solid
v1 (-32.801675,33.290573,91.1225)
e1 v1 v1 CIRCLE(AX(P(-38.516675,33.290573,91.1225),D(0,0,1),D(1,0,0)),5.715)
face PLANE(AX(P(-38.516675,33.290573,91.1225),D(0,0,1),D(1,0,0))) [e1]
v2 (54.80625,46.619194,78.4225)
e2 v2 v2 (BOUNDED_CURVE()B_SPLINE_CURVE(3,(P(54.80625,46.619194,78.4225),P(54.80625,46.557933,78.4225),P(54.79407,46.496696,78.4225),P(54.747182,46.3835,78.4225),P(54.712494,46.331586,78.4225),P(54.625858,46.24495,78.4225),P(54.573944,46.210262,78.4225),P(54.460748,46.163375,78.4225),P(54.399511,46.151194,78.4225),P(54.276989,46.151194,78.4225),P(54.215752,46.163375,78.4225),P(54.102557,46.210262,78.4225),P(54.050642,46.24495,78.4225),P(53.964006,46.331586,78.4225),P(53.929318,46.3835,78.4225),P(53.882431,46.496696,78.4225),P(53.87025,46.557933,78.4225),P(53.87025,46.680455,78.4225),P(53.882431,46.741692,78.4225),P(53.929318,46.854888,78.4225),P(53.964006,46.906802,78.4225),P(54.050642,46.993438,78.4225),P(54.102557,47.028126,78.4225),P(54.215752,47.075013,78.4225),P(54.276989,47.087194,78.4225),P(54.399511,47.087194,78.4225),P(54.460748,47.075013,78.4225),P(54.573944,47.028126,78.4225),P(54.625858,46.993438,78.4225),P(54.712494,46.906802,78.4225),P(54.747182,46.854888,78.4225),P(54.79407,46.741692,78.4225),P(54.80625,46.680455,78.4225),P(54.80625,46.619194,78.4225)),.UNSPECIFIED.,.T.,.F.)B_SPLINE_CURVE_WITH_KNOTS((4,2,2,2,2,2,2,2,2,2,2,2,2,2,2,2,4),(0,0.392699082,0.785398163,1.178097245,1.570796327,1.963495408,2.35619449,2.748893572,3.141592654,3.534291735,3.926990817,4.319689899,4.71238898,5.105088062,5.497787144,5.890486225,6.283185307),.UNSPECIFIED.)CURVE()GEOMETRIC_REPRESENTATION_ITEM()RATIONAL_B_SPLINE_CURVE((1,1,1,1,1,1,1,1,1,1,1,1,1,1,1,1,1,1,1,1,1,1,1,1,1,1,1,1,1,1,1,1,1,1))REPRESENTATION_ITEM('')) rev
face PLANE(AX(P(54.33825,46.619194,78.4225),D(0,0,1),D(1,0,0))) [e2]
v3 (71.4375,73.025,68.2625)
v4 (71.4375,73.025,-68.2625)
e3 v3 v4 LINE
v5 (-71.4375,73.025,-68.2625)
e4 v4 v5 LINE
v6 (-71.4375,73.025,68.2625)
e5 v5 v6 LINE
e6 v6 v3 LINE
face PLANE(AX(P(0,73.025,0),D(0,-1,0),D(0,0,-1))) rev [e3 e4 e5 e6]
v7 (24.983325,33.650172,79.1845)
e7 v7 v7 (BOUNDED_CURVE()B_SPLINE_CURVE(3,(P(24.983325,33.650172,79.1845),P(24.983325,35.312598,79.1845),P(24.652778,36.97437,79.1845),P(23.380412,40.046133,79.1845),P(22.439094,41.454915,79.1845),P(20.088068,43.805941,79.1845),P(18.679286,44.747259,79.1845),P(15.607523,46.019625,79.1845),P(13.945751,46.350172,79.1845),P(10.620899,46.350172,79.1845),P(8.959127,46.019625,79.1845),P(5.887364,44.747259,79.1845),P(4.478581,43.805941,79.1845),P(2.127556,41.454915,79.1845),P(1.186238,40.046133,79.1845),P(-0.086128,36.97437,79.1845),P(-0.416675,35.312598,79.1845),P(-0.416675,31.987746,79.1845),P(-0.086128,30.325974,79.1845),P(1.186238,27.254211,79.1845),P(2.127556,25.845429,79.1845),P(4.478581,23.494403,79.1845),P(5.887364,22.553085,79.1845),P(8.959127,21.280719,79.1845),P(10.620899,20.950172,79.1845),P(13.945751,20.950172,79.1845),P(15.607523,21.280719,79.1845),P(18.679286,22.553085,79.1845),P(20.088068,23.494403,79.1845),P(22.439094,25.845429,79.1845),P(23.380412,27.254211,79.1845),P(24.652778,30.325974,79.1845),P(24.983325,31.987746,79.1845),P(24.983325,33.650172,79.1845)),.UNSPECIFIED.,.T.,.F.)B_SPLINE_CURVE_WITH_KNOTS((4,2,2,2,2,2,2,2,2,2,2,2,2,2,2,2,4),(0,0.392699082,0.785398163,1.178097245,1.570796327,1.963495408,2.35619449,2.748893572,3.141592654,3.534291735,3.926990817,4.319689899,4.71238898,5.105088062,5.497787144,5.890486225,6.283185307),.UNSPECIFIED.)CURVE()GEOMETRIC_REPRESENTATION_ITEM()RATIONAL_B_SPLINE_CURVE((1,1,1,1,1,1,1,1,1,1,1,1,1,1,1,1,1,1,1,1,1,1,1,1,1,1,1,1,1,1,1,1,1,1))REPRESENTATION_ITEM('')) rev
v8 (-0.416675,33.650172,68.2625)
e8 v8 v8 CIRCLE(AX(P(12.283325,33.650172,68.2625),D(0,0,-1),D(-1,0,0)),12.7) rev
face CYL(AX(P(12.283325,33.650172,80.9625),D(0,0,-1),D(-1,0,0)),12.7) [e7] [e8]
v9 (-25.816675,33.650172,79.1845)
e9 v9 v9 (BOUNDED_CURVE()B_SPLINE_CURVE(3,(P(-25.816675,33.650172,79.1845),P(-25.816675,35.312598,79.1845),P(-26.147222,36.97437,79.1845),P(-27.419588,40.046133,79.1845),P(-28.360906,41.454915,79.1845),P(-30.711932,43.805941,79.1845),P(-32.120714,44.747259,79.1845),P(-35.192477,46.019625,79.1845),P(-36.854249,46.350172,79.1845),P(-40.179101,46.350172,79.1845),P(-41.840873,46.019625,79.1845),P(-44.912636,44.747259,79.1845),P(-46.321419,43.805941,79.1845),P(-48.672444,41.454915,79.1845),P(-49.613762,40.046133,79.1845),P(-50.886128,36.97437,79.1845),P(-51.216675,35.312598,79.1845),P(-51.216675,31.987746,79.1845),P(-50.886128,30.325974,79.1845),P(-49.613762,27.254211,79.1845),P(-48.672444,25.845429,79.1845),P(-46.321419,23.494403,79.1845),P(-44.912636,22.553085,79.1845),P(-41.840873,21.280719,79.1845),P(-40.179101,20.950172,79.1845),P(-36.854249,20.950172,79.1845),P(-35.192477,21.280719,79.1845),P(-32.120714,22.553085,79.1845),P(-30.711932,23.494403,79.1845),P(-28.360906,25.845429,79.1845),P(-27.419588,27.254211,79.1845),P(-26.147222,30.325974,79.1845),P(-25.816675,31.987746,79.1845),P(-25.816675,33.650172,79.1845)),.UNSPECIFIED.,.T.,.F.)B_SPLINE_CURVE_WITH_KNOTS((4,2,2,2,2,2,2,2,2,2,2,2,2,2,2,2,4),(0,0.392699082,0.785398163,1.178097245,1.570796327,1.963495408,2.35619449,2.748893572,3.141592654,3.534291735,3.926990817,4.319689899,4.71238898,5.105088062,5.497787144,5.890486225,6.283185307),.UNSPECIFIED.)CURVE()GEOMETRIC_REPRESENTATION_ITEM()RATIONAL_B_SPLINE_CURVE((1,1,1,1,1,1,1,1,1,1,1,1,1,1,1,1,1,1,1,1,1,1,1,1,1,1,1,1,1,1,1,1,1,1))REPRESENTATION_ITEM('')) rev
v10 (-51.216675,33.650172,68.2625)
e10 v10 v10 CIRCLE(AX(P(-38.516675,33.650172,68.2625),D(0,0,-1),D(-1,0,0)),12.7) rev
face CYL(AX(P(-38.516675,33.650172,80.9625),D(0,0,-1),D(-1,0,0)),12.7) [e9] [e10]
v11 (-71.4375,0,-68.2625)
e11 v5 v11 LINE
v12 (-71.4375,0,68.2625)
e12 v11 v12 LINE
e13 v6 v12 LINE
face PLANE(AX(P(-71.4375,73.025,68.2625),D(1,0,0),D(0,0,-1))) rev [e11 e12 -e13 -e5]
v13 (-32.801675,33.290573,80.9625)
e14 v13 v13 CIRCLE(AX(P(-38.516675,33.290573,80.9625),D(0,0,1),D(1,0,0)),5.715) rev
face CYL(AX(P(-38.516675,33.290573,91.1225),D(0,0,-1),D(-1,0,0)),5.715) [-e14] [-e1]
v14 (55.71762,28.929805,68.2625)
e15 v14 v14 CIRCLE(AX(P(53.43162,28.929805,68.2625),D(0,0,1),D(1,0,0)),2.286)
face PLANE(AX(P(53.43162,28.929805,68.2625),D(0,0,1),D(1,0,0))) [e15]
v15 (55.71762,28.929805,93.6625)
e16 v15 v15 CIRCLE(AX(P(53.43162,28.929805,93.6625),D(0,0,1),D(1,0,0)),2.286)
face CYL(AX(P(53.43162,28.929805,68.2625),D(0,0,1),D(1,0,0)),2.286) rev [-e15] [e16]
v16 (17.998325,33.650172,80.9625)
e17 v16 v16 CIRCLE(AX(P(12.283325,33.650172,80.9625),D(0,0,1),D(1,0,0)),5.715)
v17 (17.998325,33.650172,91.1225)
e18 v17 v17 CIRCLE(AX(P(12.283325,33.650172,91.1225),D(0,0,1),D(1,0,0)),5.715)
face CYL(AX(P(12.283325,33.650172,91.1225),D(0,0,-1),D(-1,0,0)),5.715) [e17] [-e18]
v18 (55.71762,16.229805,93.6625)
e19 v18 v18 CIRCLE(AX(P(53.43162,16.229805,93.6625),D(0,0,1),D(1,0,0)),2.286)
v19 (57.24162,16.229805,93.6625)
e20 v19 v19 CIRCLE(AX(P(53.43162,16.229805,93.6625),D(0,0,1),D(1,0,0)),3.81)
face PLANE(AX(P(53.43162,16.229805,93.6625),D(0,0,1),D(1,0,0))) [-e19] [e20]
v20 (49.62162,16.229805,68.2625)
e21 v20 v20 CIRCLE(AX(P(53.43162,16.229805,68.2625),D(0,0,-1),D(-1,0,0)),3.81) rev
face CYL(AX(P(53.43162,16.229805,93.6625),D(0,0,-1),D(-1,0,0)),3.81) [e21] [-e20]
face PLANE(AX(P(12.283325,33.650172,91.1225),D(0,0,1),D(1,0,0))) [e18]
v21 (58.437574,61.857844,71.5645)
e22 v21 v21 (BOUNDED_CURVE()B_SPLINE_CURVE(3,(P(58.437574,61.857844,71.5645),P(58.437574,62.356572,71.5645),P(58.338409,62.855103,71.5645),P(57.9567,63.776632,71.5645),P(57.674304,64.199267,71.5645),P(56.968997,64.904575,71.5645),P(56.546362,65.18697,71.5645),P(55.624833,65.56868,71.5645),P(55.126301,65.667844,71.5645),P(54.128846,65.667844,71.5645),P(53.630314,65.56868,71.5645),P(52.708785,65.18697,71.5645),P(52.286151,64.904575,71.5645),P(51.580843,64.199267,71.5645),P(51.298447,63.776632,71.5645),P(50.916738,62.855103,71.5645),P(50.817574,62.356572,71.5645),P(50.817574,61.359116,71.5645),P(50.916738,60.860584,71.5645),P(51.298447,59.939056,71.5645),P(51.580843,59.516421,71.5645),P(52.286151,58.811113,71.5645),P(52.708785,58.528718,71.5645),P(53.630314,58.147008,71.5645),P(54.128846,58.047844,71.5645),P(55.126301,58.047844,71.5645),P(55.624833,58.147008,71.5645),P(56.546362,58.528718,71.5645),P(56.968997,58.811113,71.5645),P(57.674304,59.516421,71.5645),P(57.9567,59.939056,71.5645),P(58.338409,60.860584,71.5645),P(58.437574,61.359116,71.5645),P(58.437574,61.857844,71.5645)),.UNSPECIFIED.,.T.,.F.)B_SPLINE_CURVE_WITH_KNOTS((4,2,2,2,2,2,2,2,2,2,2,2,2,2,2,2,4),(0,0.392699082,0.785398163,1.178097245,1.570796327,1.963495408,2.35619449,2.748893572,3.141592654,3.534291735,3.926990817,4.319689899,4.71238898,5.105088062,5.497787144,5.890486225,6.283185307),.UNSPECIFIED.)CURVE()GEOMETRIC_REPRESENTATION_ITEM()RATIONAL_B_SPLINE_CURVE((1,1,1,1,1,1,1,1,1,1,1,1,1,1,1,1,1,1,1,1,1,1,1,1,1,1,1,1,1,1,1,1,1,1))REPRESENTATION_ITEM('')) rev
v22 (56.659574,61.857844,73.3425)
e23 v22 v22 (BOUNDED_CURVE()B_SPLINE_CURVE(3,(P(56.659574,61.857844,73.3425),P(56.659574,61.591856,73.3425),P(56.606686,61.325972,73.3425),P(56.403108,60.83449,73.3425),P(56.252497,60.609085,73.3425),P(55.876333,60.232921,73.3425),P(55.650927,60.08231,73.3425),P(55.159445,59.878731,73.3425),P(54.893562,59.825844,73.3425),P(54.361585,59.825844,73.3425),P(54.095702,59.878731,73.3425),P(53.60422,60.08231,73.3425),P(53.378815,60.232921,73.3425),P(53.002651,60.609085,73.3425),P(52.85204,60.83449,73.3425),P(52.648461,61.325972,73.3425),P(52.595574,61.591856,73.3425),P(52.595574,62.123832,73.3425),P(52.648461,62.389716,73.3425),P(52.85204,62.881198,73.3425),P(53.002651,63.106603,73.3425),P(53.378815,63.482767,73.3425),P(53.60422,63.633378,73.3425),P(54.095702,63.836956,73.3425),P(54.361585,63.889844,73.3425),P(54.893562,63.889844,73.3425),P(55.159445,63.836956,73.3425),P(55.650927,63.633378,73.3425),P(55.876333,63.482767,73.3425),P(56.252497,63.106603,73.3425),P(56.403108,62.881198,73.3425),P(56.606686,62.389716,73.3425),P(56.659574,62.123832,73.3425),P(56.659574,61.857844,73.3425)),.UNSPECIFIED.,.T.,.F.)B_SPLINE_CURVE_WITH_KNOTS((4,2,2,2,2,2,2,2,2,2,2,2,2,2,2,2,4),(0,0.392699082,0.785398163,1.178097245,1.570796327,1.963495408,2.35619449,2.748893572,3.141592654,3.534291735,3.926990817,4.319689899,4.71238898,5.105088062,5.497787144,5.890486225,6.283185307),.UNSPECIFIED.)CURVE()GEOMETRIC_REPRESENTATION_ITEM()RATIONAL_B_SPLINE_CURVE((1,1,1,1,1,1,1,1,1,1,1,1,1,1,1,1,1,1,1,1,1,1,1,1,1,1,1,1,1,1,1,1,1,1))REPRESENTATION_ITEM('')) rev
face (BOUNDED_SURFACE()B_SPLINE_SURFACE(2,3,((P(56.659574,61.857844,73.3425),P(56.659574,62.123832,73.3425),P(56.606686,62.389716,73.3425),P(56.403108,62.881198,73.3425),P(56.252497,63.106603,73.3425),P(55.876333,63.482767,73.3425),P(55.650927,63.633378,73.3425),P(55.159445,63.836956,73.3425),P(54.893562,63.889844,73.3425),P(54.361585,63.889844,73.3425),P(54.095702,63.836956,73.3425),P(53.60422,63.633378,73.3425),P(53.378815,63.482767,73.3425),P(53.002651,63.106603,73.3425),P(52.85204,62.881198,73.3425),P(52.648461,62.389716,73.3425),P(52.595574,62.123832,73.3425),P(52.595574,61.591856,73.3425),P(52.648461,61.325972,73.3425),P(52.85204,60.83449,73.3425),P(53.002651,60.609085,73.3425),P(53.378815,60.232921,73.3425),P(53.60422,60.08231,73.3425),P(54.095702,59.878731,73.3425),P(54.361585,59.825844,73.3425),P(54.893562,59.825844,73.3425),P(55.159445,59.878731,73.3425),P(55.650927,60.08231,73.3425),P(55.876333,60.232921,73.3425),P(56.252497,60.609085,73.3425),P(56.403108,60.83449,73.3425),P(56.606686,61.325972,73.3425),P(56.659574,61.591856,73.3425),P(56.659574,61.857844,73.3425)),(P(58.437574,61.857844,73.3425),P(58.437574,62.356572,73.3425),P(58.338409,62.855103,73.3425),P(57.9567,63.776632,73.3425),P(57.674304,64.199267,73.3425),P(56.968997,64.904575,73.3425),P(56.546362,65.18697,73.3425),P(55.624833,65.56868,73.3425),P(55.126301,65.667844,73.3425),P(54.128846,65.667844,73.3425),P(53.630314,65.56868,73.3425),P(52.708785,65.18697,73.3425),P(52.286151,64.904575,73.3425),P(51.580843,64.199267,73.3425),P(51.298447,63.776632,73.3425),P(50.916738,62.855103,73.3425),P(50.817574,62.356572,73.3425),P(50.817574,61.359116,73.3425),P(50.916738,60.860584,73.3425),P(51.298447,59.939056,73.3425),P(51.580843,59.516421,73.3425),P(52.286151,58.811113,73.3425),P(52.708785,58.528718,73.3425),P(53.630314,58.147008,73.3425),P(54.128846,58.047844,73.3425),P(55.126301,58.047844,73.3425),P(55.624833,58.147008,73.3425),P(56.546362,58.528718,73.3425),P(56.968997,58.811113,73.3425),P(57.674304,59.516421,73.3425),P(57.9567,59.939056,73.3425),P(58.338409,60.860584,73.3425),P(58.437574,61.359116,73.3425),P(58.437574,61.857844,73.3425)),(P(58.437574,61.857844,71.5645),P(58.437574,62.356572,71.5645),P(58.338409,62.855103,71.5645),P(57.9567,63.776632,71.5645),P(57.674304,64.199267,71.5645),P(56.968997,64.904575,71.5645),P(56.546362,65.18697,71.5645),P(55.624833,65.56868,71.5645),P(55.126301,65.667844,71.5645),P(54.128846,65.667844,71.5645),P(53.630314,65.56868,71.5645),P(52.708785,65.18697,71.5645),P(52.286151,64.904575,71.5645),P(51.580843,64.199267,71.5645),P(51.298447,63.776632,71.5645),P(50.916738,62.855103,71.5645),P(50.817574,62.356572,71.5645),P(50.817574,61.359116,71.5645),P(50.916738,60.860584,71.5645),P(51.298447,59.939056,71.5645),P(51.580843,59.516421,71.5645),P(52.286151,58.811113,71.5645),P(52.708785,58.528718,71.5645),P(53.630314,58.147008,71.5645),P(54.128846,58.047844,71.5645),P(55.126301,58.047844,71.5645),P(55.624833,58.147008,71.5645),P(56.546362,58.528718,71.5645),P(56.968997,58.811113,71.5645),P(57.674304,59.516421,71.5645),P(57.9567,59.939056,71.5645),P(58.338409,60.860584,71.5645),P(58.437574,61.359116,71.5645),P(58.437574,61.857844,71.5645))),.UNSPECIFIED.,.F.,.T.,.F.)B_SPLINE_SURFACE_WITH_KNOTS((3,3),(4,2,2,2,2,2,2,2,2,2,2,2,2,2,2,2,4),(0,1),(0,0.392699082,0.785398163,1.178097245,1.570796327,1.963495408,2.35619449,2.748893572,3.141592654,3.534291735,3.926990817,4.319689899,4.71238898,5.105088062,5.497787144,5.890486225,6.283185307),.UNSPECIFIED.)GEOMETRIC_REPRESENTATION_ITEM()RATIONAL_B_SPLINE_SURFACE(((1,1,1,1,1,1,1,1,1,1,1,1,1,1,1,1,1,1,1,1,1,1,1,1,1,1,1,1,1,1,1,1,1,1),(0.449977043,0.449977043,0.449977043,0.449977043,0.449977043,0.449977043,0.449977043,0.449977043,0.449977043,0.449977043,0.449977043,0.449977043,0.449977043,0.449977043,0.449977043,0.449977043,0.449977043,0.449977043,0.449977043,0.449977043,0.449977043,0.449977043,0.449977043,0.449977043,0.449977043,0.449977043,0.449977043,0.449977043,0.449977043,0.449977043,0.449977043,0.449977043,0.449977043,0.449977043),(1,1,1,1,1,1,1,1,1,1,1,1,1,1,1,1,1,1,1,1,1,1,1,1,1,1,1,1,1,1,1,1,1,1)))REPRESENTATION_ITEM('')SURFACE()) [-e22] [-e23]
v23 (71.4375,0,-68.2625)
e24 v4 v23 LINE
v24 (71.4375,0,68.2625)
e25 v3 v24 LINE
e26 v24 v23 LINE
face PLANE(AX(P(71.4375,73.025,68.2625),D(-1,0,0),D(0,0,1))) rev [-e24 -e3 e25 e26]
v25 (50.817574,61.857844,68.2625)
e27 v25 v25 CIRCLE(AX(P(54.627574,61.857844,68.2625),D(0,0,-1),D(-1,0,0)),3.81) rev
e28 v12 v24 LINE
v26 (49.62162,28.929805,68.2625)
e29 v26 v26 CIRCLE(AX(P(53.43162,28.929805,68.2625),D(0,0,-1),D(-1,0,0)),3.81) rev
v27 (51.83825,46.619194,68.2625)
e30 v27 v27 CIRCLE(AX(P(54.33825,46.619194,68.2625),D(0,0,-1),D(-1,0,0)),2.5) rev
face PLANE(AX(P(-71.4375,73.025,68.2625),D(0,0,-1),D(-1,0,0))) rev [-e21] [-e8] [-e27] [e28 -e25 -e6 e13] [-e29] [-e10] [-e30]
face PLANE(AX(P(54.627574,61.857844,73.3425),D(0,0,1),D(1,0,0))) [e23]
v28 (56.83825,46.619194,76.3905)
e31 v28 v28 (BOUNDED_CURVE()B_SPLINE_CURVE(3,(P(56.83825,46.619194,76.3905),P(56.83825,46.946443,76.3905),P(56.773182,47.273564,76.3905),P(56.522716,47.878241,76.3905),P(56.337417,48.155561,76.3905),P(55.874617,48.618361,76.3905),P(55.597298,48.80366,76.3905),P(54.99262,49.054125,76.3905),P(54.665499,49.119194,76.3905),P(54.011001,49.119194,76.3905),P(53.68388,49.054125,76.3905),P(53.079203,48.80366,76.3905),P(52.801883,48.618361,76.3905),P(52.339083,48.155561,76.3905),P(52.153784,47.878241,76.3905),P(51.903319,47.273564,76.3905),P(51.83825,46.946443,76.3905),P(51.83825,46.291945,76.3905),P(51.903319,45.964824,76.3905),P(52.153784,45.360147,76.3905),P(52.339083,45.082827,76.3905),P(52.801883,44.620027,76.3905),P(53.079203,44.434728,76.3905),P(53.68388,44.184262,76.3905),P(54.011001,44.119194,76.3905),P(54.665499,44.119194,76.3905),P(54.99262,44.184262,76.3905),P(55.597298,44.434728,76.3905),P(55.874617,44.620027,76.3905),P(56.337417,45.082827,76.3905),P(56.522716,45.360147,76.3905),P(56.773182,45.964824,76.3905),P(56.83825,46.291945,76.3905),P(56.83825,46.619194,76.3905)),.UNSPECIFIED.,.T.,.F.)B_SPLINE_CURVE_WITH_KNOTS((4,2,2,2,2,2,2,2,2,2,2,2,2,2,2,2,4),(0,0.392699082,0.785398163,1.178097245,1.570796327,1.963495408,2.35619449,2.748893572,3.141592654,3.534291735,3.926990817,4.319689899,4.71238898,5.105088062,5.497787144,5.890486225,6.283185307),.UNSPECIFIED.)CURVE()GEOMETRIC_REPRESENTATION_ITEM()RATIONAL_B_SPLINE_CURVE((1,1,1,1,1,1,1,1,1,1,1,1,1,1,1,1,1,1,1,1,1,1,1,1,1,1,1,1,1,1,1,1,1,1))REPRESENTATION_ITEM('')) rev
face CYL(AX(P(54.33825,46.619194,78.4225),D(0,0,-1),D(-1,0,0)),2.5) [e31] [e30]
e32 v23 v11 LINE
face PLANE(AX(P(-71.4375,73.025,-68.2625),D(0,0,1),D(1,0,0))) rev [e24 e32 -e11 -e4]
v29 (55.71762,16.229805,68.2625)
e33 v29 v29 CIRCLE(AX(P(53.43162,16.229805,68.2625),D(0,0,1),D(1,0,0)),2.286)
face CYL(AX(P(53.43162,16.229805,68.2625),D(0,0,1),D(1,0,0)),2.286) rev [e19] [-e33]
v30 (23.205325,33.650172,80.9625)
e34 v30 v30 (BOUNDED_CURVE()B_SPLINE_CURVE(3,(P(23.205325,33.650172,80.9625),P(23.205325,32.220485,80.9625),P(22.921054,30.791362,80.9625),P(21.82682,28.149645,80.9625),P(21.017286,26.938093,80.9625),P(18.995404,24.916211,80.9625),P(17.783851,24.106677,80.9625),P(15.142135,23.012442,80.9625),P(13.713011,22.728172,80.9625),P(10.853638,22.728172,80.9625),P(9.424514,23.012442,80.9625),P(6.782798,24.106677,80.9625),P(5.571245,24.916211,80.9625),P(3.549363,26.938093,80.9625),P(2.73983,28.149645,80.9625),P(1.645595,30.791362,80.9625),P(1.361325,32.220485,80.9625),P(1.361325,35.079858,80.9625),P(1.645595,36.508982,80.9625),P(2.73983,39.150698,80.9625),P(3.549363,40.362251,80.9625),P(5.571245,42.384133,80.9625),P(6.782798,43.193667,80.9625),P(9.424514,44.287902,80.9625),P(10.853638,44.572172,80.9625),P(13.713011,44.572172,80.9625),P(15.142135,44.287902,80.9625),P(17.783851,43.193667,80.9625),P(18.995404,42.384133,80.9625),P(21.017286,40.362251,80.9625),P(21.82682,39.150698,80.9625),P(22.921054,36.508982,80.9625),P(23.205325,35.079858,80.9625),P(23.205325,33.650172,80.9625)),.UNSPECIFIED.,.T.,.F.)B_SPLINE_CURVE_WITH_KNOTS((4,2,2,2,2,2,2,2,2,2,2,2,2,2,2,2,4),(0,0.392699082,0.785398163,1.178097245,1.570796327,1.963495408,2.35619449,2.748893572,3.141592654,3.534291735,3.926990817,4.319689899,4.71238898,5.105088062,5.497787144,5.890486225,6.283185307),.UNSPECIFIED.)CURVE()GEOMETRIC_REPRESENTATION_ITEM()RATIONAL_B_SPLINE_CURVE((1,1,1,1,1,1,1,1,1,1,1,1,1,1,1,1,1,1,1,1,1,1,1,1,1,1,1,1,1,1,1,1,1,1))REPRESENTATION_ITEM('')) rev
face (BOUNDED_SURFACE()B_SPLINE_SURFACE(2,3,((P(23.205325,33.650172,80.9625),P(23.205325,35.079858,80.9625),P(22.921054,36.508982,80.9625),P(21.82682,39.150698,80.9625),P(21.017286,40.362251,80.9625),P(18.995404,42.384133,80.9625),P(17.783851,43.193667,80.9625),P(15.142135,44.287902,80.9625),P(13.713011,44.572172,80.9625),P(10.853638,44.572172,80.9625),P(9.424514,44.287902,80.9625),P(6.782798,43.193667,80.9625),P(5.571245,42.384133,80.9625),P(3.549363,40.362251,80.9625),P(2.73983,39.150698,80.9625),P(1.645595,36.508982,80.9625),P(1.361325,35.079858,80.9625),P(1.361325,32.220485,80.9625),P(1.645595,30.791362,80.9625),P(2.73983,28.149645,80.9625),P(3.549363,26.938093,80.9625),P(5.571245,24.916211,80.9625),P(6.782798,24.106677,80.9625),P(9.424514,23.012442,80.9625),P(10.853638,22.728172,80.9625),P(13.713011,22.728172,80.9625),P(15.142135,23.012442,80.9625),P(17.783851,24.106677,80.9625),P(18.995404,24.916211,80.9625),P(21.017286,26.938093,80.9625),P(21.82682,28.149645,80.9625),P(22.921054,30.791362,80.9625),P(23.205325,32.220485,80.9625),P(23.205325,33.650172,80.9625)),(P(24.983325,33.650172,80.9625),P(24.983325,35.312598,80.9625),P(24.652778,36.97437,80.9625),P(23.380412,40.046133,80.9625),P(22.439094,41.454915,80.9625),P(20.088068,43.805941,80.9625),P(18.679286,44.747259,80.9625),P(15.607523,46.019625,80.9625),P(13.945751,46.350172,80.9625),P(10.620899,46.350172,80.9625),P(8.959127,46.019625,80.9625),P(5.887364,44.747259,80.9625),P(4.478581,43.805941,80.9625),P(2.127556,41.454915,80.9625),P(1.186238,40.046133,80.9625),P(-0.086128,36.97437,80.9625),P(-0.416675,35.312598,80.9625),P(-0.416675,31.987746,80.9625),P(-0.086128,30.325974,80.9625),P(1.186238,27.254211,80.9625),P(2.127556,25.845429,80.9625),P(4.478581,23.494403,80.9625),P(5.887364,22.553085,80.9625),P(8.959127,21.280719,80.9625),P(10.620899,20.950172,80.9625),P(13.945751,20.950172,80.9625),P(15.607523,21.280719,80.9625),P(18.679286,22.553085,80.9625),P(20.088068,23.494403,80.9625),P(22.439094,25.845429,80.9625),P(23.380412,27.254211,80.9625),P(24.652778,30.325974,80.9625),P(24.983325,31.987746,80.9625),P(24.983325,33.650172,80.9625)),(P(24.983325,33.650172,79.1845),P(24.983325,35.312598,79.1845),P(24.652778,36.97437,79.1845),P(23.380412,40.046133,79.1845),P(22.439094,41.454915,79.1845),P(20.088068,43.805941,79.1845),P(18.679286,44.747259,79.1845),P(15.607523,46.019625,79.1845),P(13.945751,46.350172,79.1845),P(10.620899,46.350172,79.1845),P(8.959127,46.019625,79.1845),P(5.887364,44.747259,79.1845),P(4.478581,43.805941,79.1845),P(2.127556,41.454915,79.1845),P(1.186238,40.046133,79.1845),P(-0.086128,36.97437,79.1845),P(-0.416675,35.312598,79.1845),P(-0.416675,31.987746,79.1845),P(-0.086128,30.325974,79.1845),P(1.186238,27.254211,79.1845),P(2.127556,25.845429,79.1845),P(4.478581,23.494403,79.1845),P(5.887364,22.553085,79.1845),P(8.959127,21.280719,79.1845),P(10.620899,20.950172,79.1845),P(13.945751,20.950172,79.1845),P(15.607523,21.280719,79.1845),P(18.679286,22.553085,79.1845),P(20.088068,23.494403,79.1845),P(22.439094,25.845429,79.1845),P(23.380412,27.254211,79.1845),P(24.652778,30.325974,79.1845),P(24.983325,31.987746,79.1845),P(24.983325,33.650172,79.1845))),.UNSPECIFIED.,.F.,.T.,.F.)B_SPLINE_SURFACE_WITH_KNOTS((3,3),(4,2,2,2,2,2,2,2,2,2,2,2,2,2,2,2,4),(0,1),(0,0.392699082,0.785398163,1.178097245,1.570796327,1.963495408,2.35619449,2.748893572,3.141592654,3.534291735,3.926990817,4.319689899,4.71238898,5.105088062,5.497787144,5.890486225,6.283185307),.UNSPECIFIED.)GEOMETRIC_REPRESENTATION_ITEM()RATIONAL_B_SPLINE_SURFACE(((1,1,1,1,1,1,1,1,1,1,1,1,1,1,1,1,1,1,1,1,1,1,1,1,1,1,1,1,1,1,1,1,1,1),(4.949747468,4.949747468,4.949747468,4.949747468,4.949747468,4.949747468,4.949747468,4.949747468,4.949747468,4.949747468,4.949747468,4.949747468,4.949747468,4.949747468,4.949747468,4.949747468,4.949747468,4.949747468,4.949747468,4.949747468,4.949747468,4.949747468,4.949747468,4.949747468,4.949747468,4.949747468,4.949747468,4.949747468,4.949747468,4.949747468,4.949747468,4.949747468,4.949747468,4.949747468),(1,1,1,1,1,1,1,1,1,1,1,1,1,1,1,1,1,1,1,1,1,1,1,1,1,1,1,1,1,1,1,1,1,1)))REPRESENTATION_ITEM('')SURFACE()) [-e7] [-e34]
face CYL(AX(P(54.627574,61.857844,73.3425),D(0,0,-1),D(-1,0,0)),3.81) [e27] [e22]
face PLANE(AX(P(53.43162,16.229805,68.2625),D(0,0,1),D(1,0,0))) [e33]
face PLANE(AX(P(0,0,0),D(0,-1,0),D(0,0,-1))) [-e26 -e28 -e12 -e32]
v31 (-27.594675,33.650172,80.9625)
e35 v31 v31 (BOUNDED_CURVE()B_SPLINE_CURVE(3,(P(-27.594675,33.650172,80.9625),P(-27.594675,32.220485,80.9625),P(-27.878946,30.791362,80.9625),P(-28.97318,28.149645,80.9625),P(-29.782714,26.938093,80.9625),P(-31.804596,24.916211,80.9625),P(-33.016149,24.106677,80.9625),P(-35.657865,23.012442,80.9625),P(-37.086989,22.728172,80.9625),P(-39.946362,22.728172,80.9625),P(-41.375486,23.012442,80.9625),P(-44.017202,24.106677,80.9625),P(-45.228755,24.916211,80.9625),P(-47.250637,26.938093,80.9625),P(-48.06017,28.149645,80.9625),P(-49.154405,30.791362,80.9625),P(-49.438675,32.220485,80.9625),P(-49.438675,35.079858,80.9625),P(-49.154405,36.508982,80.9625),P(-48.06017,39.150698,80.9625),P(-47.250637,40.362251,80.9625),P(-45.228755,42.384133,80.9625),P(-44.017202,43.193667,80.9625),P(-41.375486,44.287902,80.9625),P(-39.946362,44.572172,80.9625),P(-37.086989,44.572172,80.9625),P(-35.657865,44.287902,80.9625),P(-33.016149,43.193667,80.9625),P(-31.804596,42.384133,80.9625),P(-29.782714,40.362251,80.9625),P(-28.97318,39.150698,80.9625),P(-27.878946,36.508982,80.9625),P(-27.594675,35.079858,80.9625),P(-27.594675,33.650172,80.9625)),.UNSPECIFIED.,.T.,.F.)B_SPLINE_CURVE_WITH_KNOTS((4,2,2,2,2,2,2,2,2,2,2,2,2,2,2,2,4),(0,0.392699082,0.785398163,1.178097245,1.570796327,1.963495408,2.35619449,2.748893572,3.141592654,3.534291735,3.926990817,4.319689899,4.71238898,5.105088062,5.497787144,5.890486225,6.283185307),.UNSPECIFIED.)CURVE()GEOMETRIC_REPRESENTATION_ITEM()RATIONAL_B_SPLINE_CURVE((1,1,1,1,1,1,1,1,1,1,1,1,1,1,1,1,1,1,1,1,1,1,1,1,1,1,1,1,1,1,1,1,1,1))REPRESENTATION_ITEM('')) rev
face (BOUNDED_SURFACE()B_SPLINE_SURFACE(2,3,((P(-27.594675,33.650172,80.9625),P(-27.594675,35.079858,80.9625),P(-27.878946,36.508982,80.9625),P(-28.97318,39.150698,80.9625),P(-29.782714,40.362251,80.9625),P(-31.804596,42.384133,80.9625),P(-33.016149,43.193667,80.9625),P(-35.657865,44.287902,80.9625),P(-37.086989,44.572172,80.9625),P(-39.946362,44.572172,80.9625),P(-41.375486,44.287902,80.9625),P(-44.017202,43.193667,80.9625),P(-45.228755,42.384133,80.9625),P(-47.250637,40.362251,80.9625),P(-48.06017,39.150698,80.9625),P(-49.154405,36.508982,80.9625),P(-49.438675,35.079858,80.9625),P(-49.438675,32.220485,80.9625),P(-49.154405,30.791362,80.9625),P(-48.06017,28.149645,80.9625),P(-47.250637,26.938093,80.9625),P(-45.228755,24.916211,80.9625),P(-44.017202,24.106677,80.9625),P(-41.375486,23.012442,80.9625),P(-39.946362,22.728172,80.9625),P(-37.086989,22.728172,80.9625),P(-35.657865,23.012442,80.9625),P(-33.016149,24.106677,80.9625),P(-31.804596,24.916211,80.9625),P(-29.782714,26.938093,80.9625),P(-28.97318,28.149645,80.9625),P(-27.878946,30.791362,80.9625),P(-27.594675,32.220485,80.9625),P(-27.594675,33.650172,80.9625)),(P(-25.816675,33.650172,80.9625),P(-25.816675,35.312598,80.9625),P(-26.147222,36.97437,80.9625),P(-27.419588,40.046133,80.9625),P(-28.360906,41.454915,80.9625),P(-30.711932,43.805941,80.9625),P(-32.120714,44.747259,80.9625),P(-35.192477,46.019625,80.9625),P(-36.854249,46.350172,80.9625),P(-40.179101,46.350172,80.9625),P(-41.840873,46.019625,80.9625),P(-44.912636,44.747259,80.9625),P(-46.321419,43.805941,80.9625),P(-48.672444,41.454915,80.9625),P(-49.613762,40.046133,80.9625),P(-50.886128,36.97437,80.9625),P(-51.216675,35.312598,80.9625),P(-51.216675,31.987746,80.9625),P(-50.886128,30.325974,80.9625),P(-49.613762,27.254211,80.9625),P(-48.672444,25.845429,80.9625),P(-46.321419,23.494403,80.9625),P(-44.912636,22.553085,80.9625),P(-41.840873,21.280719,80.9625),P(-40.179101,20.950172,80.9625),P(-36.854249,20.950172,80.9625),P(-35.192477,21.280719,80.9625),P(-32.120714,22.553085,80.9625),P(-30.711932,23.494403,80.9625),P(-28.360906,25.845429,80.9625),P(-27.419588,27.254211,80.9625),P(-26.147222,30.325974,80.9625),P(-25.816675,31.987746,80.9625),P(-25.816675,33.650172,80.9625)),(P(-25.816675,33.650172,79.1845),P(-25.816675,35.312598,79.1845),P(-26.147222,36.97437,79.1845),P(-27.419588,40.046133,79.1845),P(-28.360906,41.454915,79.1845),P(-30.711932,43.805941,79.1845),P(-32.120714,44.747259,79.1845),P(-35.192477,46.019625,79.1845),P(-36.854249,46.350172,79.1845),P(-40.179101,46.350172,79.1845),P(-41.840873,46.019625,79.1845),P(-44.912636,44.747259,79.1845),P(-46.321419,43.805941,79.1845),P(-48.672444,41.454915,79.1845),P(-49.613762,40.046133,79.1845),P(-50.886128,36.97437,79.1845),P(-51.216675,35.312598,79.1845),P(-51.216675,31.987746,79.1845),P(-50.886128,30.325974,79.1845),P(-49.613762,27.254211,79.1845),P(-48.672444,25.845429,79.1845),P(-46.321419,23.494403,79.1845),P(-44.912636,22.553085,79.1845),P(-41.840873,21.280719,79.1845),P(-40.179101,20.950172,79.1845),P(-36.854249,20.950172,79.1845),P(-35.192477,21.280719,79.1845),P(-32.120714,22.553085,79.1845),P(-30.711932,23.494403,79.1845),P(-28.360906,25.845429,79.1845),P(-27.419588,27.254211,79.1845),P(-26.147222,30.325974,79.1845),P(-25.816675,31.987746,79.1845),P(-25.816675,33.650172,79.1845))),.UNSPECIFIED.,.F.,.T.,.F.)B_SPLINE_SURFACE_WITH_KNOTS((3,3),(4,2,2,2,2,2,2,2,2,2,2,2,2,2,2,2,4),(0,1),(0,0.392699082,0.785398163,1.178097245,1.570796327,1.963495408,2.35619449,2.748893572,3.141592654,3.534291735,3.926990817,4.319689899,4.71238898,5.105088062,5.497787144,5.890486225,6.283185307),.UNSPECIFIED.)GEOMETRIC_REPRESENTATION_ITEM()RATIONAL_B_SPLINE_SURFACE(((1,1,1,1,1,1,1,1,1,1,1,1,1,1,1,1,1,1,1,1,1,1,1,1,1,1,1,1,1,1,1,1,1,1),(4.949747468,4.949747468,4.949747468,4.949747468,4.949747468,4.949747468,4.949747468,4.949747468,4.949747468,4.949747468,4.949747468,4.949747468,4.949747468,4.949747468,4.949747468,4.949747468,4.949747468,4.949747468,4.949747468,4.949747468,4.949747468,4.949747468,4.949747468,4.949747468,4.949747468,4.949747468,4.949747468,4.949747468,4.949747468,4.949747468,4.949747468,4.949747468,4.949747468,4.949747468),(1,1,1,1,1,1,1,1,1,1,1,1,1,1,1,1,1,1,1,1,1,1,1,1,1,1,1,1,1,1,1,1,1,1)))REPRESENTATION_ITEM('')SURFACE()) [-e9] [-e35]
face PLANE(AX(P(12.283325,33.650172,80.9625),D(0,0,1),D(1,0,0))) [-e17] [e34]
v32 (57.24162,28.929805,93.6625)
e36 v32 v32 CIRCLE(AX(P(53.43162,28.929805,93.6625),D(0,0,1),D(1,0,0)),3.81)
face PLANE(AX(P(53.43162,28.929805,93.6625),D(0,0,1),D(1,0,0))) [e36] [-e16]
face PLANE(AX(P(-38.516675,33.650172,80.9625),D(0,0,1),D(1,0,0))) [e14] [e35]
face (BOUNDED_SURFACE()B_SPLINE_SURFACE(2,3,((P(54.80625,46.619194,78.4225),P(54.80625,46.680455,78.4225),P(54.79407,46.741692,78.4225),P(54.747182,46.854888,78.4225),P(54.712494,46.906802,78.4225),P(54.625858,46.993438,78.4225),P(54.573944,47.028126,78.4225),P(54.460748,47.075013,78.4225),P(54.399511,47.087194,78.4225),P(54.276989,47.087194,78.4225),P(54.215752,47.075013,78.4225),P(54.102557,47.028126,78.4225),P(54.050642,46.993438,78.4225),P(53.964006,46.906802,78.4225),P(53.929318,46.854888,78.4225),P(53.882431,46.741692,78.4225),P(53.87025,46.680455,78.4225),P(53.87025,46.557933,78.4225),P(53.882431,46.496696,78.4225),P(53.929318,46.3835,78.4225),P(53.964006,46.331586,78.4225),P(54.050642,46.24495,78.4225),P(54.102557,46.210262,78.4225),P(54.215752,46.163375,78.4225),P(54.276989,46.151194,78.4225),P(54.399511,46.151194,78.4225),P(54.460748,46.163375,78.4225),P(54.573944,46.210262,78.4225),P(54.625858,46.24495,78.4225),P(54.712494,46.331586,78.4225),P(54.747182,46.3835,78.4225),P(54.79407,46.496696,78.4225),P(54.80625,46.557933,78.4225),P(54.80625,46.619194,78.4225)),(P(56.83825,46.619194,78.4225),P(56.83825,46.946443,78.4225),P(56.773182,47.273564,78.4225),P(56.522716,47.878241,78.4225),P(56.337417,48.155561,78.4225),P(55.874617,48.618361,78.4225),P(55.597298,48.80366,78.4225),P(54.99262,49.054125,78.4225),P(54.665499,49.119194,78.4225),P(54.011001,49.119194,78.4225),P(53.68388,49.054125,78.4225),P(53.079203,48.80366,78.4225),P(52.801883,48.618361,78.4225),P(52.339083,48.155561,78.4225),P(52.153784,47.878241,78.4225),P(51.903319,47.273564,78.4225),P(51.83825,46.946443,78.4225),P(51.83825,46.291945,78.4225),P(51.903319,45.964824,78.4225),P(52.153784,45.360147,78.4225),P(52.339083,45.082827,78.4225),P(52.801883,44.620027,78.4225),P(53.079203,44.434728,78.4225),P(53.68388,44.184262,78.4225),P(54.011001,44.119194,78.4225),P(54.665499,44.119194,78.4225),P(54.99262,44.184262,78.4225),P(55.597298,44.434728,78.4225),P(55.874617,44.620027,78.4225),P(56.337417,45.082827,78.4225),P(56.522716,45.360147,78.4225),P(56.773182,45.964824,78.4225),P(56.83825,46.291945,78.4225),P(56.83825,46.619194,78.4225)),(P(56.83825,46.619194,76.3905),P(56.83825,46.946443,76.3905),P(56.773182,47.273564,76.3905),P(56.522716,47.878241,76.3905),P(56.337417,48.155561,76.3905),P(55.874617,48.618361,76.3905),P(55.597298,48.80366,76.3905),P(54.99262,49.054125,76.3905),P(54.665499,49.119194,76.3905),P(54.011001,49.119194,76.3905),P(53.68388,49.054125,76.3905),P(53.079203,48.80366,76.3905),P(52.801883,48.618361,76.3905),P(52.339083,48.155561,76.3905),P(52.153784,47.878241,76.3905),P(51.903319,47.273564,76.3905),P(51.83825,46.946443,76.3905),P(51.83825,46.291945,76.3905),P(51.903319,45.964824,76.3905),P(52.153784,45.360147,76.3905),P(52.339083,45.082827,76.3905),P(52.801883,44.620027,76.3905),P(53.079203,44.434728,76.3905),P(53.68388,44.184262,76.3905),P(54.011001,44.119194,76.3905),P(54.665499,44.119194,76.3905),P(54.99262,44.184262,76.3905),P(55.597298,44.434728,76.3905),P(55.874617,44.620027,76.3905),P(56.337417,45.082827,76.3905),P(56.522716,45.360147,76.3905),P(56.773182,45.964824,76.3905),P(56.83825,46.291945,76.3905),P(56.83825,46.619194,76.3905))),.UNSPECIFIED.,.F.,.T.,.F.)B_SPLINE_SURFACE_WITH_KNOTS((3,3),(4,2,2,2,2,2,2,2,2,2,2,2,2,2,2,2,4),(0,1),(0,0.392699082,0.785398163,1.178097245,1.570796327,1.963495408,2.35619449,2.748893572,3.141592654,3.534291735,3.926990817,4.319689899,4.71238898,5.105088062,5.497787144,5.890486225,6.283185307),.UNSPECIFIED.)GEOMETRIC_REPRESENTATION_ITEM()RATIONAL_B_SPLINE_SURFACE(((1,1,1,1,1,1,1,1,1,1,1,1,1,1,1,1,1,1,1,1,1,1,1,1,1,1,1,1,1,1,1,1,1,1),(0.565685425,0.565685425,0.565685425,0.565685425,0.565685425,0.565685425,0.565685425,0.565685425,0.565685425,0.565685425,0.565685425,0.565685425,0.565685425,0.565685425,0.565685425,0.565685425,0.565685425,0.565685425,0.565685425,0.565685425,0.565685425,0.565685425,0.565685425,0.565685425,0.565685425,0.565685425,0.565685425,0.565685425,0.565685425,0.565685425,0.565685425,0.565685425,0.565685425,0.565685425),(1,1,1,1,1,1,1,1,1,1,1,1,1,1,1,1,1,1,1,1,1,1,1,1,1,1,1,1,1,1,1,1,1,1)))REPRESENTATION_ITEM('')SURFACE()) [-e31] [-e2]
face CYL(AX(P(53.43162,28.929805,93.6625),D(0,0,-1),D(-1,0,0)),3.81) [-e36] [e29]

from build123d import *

# Parameters (mm, degrees)
SKETCH1_W           = 142.875
SKETCH1_H           = 136.525
BOSS_EXTRUDE1_DEPTH = 73.025
SKETCH2_R           = 12.7
BOSS_EXTRUDE2_DEPTH = 12.7
FILLET2_SIZE        = 1.778
SKETCH3_R           = 5.715
BOSS_EXTRUDE3_DEPTH = 22.86
LPATTERN1_COUNT     = 2
LPATTERN1_PITCH     = 50.8
FILLET3_SIZE        = 1.778
SKETCH5_R           = 5.715
BOSS_EXTRUDE4_DEPTH = 10.16
SKETCH6_R           = 3.81
BOSS_EXTRUDE5_DEPTH = 5.08
FILLET4_SIZE        = 1.778
SKETCH7_R           = 2.5
BOSS_EXTRUDE6_DEPTH = 10.16
FILLET5_SIZE        = 2.032
SKETCH9_R           = 3.81
BOSS_EXTRUDE7_DEPTH = 25.4
SKETCH10_R          = 2.286
CUT_EXTRUDE1_DEPTH  = 25.4
LPATTERN2_COUNT     = 2
LPATTERN2_PITCH     = 12.7
SKETCH11_R          = 2.286
CUT_EXTRUDE2_DEPTH  = 25.4


with BuildPart() as part:
    # Sketch1 → Boss-Extrude1 (new body)
    with BuildSketch(Plane(origin=(0, 0, 0), x_dir=(1, 0, 0), z_dir=(0, 1, 0))):
        Rectangle(SKETCH1_W, SKETCH1_H)
    extrude(amount=BOSS_EXTRUDE1_DEPTH)

    # Sketch2 → Boss-Extrude2 (add)
    with BuildSketch(Plane.XY.offset(68.2625)):
        with Locations(Location((-38.516675306, 33.650171928, 0), (0, 0, 180))):
            Circle(SKETCH2_R)
    boss_extrude2 = extrude(amount=BOSS_EXTRUDE2_DEPTH)

    # Fillet2
    # a fillet whose section is not a circle: 1.778 mm, written as the material it takes off along each edge
    with BuildSketch(Plane(origin=(-38.516675306, 33.650171928, 80.9625), x_dir=(-1, 0, 0), z_dir=(0, 1, 0))) as fillet2_piece_1:
        with BuildLine():
            Bezier((12.7, -FILLET2_SIZE), (12.7, 0), (12.7 - FILLET2_SIZE, 0), weights=[1, 4.949747468, 1])
            Line((12.7 - FILLET2_SIZE, 0), (12.7, 0))
            Line((12.7, 0), (12.7, -FILLET2_SIZE))
        make_face()
    revolve(axis=Axis((-38.516675306, 33.650171928, 80.9625), (0, 0, 1)), mode=Mode.SUBTRACT)

    # Sketch3 → Boss-Extrude3 (add)
    with BuildSketch(Plane.XY.offset(68.2625)):
        with Locations((-38.516675306, 33.290572788)):
            Circle(SKETCH3_R)
    extrude(amount=BOSS_EXTRUDE3_DEPTH)

    # LPattern1: Boss-Extrude2 ×2
    with Locations(*[(i * LPATTERN1_PITCH, 0, 0) for i in range(1, LPATTERN1_COUNT)]):
        add(boss_extrude2)

    # Fillet3
    # a fillet whose section is not a circle: 1.778 mm, written as the material it takes off along each edge
    with BuildSketch(Plane(origin=(12.283324694, 33.650171928, 80.9625), x_dir=(-1, 0, 0), z_dir=(0, 1, 0))) as fillet3_piece_1:
        with BuildLine():
            Bezier((12.7, -FILLET3_SIZE), (12.7, 0), (12.7 - FILLET3_SIZE, 0), weights=[1, 4.949747468, 1])
            Line((12.7 - FILLET3_SIZE, 0), (12.7, 0))
            Line((12.7, 0), (12.7, -FILLET3_SIZE))
        make_face()
    revolve(axis=Axis((12.283324694, 33.650171928, 80.9625), (0, 0, 1)), mode=Mode.SUBTRACT)

    # Sketch5 → Boss-Extrude4 (add)
    with BuildSketch(Plane.XY.offset(80.9625)):
        with Locations((12.283324694, 33.650171928)):
            Circle(SKETCH5_R)
    extrude(amount=BOSS_EXTRUDE4_DEPTH)

    # Sketch6 → Boss-Extrude5 (add)
    with BuildSketch(Plane.XY.offset(68.2625)):
        with Locations(Location((54.627573576, 61.857843882, 0), (0, 0, 180))):
            Circle(SKETCH6_R)
    extrude(amount=BOSS_EXTRUDE5_DEPTH)

    # Fillet4
    # a fillet whose section is not a circle: 1.778 mm, written as the material it takes off along each edge
    with BuildSketch(Plane(origin=(54.627573576, 61.857843882, 73.3425), x_dir=(-1, 0, 0), z_dir=(0, 1, 0))) as fillet4_piece_1:
        with BuildLine():
            Bezier((3.81, -FILLET4_SIZE), (3.81, 0), (3.81 - FILLET4_SIZE, 0), weights=[1, 0.449977043, 1])
            Line((3.81 - FILLET4_SIZE, 0), (3.81, 0))
            Line((3.81, 0), (3.81, -FILLET4_SIZE))
        make_face()
    revolve(axis=Axis((54.627573576, 61.857843882, 73.3425), (0, 0, 1)), mode=Mode.SUBTRACT)

    # Sketch7 → Boss-Extrude6 (add)
    with BuildSketch(Plane.XY.offset(68.2625)):
        with Locations(Location((54.338250319, 46.619193899, 0), (0, 0, 180))):
            Circle(SKETCH7_R)
    extrude(amount=BOSS_EXTRUDE6_DEPTH)

    # Fillet5
    # a fillet whose section is not a circle: 2.032 mm, written as the material it takes off along each edge
    with BuildSketch(Plane(origin=(54.338250319, 46.619193899, 78.4225), x_dir=(-1, 0, 0), z_dir=(0, 1, 0))) as fillet5_piece_1:
        with BuildLine():
            Bezier((2.5, -FILLET5_SIZE), (2.5, 0), (2.5 - FILLET5_SIZE, 0), weights=[1, 0.565685425, 1])
            Line((2.5 - FILLET5_SIZE, 0), (2.5, 0))
            Line((2.5, 0), (2.5, -FILLET5_SIZE))
        make_face()
    revolve(axis=Axis((54.338250319, 46.619193899, 78.4225), (0, 0, 1)), mode=Mode.SUBTRACT)

    # Sketch9 → Boss-Extrude7 (add)
    with BuildSketch(Plane.XY.offset(68.2625)):
        with Locations(Location((53.431620425, 28.929804746, 0), (0, 0, 180))):
            Circle(SKETCH9_R)
    boss_extrude7 = extrude(amount=BOSS_EXTRUDE7_DEPTH)

    # Sketch10 → Cut-Extrude1 (cut)
    with BuildSketch(Plane.XY.offset(93.6625)):
        with Locations((53.431620425, 28.929804746)):
            Circle(SKETCH10_R)
    extrude(amount=-CUT_EXTRUDE1_DEPTH, mode=Mode.SUBTRACT)

    # LPattern2: Boss-Extrude7 ×2
    with Locations(*[(0, -i * LPATTERN2_PITCH, 0) for i in range(1, LPATTERN2_COUNT)]):
        add(boss_extrude7)

    # Sketch11 → Cut-Extrude2 (cut)
    with BuildSketch(Plane.XY.offset(93.6625)):
        with Locations((53.431620425, 16.229804746)):
            Circle(SKETCH11_R)
    extrude(amount=-CUT_EXTRUDE2_DEPTH, mode=Mode.SUBTRACT)


solid = part.part
